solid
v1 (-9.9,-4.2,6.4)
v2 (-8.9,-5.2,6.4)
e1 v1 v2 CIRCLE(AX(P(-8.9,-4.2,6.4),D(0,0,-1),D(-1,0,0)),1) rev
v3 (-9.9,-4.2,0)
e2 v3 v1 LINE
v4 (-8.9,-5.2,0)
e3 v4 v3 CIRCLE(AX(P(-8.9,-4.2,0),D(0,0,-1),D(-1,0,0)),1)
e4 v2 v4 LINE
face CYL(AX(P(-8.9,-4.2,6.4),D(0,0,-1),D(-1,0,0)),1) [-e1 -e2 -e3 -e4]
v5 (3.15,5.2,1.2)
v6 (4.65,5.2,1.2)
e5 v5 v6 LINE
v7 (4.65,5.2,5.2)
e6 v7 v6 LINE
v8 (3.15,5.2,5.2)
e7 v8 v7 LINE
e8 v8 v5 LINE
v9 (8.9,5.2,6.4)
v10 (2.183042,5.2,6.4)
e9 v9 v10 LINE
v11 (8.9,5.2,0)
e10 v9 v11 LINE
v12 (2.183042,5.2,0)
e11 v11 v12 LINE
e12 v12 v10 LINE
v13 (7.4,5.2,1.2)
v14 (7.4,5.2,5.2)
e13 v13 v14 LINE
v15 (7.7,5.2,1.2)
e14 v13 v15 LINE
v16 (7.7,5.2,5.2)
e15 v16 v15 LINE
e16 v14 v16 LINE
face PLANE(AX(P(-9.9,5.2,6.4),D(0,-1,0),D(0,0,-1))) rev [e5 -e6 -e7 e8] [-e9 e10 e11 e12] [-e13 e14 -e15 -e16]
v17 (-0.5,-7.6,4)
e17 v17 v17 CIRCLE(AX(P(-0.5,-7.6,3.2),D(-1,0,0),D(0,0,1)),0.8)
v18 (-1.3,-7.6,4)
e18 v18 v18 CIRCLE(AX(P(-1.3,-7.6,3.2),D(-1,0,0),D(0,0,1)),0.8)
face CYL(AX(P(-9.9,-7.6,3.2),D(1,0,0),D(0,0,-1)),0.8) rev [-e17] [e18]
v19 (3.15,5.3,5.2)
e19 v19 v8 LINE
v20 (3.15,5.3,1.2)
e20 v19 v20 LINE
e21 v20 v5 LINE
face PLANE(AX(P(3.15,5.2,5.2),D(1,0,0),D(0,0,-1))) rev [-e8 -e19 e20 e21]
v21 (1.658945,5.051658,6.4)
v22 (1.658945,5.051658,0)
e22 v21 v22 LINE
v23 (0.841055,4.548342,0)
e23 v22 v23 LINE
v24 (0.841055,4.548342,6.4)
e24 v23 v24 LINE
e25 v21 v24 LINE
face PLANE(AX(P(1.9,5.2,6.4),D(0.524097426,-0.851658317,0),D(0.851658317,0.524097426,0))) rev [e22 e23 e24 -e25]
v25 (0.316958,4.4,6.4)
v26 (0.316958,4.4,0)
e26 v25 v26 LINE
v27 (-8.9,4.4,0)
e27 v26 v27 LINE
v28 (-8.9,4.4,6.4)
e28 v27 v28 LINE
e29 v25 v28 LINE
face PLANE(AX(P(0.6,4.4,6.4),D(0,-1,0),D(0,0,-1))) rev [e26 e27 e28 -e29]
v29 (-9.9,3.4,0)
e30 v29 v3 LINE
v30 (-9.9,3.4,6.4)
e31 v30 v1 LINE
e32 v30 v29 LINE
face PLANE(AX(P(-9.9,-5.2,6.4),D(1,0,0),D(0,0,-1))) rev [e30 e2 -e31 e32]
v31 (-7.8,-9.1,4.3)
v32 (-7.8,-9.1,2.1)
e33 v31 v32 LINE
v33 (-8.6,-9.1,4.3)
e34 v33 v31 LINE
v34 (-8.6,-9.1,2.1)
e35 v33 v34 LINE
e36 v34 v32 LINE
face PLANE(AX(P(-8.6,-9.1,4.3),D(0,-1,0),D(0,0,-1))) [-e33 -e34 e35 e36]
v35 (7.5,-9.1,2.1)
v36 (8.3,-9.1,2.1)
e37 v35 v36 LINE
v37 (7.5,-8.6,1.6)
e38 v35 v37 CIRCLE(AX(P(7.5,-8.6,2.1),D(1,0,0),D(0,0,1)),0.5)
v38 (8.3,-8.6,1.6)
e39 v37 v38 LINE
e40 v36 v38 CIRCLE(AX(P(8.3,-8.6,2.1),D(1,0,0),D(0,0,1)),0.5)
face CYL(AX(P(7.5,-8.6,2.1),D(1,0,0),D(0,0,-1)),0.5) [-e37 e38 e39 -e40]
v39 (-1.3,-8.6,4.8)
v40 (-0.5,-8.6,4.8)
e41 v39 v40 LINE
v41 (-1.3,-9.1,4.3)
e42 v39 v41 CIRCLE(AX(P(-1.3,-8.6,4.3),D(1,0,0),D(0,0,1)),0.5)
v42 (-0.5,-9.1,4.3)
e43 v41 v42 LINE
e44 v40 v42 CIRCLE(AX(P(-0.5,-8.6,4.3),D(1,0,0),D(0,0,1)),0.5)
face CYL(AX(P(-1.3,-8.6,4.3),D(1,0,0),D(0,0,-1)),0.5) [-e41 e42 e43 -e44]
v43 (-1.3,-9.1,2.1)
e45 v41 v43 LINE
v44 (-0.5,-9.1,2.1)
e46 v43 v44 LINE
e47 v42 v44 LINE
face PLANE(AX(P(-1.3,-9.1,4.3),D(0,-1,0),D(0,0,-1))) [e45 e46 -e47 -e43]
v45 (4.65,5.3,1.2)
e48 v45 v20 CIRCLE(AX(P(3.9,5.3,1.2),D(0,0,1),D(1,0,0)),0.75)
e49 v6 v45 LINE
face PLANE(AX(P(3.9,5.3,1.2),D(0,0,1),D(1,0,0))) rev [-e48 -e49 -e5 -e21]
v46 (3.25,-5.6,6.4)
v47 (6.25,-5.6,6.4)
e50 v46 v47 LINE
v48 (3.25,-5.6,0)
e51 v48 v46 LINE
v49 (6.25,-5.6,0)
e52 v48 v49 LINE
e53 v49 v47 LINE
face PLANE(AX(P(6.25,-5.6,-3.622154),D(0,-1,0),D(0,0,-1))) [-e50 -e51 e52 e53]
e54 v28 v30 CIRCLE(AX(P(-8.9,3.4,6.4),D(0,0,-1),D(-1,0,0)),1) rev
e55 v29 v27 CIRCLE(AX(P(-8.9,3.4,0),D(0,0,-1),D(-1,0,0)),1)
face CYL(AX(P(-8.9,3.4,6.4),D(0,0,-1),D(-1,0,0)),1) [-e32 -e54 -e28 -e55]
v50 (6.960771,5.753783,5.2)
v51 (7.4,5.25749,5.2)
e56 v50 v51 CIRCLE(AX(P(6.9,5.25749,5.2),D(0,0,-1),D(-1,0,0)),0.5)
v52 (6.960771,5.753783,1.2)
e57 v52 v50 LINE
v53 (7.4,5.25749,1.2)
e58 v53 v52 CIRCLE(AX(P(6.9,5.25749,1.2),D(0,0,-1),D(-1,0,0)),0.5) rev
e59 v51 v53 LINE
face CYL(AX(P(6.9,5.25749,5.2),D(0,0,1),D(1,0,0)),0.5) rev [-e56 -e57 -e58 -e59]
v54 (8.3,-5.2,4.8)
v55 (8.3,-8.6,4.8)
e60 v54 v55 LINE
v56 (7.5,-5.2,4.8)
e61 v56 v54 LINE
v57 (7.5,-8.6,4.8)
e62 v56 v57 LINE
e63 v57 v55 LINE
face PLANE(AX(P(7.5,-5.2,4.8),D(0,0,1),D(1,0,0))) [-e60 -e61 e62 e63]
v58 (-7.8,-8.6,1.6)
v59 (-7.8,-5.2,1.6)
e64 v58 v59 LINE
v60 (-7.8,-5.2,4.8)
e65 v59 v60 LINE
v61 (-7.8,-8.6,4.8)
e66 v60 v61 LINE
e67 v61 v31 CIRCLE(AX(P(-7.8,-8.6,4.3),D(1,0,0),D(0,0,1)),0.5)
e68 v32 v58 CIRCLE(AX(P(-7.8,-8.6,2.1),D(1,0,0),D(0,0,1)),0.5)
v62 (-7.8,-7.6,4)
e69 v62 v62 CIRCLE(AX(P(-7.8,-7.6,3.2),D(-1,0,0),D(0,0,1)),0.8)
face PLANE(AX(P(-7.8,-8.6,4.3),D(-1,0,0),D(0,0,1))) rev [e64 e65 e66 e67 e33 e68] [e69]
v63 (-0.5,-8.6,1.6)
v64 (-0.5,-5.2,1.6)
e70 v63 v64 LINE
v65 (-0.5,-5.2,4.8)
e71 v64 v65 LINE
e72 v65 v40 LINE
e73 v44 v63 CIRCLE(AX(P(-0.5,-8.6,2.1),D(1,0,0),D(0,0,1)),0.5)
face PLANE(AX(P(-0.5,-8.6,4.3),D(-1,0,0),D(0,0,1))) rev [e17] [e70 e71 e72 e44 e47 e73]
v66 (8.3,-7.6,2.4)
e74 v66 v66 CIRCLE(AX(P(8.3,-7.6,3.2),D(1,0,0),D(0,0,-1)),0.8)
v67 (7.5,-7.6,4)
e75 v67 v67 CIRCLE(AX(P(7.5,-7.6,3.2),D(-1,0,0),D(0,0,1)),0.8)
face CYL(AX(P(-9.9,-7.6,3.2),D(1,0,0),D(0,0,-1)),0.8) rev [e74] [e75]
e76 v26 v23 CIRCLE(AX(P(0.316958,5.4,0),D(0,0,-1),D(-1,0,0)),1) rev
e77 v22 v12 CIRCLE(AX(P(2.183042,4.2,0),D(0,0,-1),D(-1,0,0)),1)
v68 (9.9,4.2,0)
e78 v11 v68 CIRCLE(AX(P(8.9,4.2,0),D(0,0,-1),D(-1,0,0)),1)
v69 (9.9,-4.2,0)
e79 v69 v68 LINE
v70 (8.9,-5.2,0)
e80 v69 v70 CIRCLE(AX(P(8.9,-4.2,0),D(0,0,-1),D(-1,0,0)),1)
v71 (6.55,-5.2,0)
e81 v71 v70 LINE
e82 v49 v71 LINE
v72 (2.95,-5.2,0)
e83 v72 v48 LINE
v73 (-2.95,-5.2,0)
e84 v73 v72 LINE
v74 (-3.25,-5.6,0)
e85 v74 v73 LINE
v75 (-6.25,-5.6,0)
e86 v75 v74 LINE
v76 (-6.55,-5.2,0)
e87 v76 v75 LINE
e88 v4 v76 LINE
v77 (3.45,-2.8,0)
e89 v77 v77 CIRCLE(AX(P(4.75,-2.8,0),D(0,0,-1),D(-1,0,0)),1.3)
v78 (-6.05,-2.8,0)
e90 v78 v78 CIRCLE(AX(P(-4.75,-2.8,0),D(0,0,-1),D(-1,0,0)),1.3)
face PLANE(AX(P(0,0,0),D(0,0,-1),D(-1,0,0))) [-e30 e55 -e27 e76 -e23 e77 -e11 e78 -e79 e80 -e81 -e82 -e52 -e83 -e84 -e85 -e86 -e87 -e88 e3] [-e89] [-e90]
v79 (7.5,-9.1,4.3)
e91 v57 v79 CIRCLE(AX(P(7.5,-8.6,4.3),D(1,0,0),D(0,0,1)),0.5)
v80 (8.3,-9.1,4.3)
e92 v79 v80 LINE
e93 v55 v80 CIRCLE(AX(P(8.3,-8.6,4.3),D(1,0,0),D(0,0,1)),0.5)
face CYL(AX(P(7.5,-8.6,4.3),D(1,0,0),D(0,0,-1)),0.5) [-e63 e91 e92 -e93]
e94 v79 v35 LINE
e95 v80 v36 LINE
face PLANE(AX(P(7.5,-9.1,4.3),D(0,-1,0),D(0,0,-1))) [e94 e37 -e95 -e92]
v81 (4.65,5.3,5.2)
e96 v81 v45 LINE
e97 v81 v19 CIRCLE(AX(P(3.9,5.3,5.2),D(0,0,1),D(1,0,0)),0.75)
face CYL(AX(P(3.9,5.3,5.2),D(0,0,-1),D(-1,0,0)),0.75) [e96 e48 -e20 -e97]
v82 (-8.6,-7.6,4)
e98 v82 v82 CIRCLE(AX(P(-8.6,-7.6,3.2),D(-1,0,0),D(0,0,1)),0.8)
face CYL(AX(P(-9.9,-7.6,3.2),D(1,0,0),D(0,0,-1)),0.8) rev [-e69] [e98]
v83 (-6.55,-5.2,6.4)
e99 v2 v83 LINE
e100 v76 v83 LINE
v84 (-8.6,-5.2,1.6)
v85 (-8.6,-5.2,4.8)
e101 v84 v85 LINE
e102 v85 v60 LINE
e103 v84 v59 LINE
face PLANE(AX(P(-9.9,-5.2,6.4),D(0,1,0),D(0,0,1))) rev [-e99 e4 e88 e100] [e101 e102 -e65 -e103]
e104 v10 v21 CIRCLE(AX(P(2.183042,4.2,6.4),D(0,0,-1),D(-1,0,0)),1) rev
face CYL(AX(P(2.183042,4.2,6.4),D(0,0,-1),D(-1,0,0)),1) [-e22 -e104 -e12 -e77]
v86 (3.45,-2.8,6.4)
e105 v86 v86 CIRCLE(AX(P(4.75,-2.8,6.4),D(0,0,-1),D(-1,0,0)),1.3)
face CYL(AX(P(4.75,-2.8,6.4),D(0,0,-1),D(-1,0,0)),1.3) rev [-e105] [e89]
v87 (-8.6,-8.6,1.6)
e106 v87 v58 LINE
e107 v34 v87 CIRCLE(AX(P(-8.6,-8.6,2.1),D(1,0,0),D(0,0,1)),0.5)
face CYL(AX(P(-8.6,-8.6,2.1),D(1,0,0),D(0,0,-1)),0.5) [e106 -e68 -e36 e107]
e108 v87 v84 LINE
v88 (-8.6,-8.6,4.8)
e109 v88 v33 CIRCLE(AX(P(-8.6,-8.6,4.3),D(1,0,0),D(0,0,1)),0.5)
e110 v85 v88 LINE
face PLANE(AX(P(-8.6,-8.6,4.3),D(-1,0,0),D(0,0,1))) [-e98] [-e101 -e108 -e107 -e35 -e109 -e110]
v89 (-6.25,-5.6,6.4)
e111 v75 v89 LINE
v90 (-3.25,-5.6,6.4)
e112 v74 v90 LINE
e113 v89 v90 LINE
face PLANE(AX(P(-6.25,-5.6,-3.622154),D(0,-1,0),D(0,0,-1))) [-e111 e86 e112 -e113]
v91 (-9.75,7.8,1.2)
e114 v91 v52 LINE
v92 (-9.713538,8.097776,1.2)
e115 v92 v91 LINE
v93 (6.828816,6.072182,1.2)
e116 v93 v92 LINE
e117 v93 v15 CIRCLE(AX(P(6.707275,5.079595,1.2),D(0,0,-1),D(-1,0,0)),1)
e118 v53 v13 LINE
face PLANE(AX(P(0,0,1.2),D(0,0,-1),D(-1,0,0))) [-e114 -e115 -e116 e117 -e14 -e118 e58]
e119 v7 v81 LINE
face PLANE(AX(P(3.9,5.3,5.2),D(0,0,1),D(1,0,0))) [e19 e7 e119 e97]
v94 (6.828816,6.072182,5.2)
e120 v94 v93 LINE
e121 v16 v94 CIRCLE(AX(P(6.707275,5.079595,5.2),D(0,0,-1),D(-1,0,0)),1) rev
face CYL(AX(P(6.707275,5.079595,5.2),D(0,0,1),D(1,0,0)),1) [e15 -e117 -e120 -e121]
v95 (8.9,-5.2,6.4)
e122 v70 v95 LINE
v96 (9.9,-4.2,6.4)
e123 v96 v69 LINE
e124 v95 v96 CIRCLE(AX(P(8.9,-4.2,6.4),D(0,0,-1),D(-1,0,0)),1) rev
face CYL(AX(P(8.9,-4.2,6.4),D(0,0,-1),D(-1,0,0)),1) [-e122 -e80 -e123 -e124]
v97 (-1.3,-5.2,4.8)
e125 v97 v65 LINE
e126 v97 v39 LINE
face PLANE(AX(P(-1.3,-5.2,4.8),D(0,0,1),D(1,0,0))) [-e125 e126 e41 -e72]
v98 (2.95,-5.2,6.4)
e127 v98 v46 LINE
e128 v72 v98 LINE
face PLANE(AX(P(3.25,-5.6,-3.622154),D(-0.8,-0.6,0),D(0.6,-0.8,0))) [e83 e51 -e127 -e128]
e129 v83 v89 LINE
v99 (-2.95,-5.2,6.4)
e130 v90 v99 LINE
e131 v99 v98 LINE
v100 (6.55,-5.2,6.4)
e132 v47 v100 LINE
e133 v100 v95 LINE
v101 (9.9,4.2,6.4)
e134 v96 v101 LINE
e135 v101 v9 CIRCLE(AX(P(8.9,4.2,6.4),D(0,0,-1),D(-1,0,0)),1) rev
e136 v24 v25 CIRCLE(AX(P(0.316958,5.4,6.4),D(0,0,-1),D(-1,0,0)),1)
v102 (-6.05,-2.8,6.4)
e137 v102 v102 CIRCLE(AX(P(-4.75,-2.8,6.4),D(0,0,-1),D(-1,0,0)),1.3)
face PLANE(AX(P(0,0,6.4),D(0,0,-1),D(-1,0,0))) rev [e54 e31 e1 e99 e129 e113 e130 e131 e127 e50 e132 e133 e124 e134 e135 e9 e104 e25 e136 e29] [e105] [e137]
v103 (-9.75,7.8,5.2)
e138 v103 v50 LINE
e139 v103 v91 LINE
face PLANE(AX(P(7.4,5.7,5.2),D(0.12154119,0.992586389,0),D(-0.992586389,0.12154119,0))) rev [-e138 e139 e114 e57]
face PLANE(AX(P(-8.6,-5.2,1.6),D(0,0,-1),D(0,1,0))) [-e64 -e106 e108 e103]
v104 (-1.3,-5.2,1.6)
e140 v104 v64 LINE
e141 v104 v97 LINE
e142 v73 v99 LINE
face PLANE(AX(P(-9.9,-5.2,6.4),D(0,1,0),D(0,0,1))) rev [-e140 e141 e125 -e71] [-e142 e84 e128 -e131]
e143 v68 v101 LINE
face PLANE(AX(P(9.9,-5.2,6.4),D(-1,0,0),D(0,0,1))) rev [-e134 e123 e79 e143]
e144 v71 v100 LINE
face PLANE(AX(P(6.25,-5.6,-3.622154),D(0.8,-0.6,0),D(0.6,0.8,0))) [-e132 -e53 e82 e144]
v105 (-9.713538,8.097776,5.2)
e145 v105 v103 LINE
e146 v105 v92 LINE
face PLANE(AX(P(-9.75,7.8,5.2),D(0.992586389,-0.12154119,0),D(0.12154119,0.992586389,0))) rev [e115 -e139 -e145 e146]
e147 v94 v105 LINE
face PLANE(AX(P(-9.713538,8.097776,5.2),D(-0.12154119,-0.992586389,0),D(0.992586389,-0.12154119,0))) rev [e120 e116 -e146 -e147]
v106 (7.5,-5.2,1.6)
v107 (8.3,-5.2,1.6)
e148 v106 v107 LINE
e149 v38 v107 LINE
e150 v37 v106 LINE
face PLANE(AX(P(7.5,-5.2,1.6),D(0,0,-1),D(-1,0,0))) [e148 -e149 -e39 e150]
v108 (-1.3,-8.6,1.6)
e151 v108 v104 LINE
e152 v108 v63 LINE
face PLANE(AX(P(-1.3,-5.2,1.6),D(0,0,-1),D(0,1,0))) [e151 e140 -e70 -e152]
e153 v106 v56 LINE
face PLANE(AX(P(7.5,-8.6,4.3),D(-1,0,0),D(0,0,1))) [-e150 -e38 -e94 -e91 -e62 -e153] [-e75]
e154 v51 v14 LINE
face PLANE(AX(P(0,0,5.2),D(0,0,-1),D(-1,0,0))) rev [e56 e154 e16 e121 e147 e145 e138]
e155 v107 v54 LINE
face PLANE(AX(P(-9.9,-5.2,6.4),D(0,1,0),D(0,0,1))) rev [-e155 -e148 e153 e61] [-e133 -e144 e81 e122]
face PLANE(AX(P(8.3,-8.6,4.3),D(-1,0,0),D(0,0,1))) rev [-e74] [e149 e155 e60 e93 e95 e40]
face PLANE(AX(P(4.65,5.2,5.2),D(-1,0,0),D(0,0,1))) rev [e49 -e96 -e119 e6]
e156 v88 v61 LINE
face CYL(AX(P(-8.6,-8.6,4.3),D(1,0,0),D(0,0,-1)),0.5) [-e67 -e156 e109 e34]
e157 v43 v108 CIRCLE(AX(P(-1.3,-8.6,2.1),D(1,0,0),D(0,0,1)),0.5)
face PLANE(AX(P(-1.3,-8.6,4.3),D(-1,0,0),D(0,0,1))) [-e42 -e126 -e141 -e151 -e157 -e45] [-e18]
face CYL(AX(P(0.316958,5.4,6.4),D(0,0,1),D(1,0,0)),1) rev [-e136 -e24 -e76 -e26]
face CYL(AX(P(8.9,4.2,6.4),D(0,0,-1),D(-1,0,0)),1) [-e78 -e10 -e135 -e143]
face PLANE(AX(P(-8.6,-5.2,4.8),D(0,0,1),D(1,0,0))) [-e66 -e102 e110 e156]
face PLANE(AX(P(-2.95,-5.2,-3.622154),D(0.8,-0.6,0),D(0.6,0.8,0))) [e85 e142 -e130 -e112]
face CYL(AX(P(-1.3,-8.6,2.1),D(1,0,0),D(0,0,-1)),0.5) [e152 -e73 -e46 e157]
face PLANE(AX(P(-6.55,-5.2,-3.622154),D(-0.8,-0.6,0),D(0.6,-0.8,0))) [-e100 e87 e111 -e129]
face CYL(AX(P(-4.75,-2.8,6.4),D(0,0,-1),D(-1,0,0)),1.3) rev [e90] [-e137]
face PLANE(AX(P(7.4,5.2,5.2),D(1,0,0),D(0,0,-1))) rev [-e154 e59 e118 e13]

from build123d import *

# Parameters (mm, degrees)
SKETCH_1_W          = 19.8
SKETCH_1_H          = 10.4
EXTRUDE_1_DEPTH     = 6.4
SKETCH_2_R          = 1.3
CUT_EXTRUDE_1_DEPTH = 13.884486796
EXTRUDE_2_DEPTH     = 0.8
EXTRUDE_3_DEPTH     = 0.8
EXTRUDE_4_DEPTH     = 0.8
SKETCH_8_R          = 0.8
CUT_EXTRUDE_3_DEPTH = 22.33096341
CUT_EXTRUDE_4_DEPTH = 15.892279879
FILLET_3_R          = 1
EXTRUDE_5_DEPTH     = 4
EXTRUDE_10_DEPTH    = 4
FILLET_4_R          = 0.5
FILLET_5_R          = 1
FILLET_6_R          = 1
FILLET_7_R          = 1
EXTRUDE_11_DEPTH    = 6.4


with BuildPart() as part:
    # 草图1 → 凸台-拉伸1 (new body)
    with BuildSketch(Plane.XY):
        Rectangle(SKETCH_1_W, SKETCH_1_H)
    extrude(amount=EXTRUDE_1_DEPTH)

    # 草图2 → 切除-拉伸1 (cut, through all)
    with BuildSketch(Plane(origin=(0, 0, 0), x_dir=(-1, 0, 0), z_dir=(0, 0, -1))):
        with Locations((-4.75, -2.8)):
            Circle(SKETCH_2_R)
        with Locations((4.75, -2.8)):
            Circle(SKETCH_2_R)
    extrude(amount=-CUT_EXTRUDE_1_DEPTH, mode=Mode.SUBTRACT)

    # 草图5 → 凸台-拉伸2 (add)
    with BuildSketch(Plane(origin=(8.3, 0, 0), x_dir=(0, 0, -1), z_dir=(1, 0, 0))):
        with BuildLine():
            Line((-4.8, -5.2), (-1.6, -5.2))
            Line((-1.6, -5.2), (-1.6, -8.6))
            ThreePointArc((-1.6, -8.6), (-1.746446609, -8.953553391), (-2.1, -9.1))
            Line((-2.1, -9.1), (-4.3, -9.1))
            ThreePointArc((-4.3, -9.1), (-4.653553391, -8.953553391), (-4.8, -8.6))
            Line((-4.8, -8.6), (-4.8, -5.2))
        make_face()
    extrude(amount=-EXTRUDE_2_DEPTH)

    # 草图6 → 凸台-拉伸3 (add)
    with BuildSketch(Plane(origin=(-0.5, 0, 0), x_dir=(0, 0, -1), z_dir=(1, 0, 0))):
        with BuildLine():
            Line((-4.8, -5.2), (-1.6, -5.2))
            Line((-1.6, -5.2), (-1.6, -8.6))
            ThreePointArc((-1.6, -8.6), (-1.746446609, -8.953553391), (-2.1, -9.1))
            Line((-2.1, -9.1), (-4.3, -9.1))
            ThreePointArc((-4.3, -9.1), (-4.653553391, -8.953553391), (-4.8, -8.6))
            Line((-4.8, -8.6), (-4.8, -5.2))
        make_face()
    extrude(amount=-EXTRUDE_3_DEPTH)

    # 草图7 → 凸台-拉伸4 (add)
    with BuildSketch(Plane(origin=(-7.8, 0, 0), x_dir=(0, 0, -1), z_dir=(1, 0, 0))):
        with BuildLine():
            Line((-4.8, -5.2), (-1.6, -5.2))
            Line((-1.6, -5.2), (-1.6, -8.6))
            ThreePointArc((-1.6, -8.6), (-1.746446609, -8.953553391), (-2.1, -9.1))
            Line((-2.1, -9.1), (-4.3, -9.1))
            ThreePointArc((-4.3, -9.1), (-4.653553391, -8.953553391), (-4.8, -8.6))
            Line((-4.8, -8.6), (-4.8, -5.2))
        make_face()
    extrude(amount=-EXTRUDE_4_DEPTH)

    # 草图8 → 切除-拉伸3 (cut, through all)
    with BuildSketch(Plane(origin=(8.3, 0, 0), x_dir=(0, 0, -1), z_dir=(1, 0, 0))):
        with Locations(Location((-3.2, -7.6, 0), (0, 0, 180))):
            Circle(SKETCH_8_R)
    extrude(amount=-CUT_EXTRUDE_3_DEPTH, mode=Mode.SUBTRACT)

    # 草图9 → 切除-拉伸4 (cut, through all)
    with BuildSketch(Plane(origin=(0, 0, 0), x_dir=(-1, 0, 0), z_dir=(0, 0, -1))):
        Polygon((-1.9, 5.2), (-0.6, 4.4), (9.9, 4.4), (9.9, 5.2), align=None)
    extrude(amount=-CUT_EXTRUDE_4_DEPTH, mode=Mode.SUBTRACT)

    # 圆角3
    fillet_3_edges = [part.edges().sort_by_distance(p)[0] for p in [
        (1.9, 5.2, 3.2),
        (0.6, 4.4, 3.2),
    ]]
    fillet(fillet_3_edges, radius=FILLET_3_R)

    # 草图10 → 凸台-拉伸5 (add)
    with BuildSketch(Plane.XY.offset(1.2)):
        with BuildLine():
            Line((3.15, 5.2), (4.65, 5.2))
            Line((4.65, 5.2), (4.65, 5.3))
            ThreePointArc((4.65, 5.3), (3.9, 6.05), (3.15, 5.3))
            Line((3.15, 5.3), (3.15, 5.2))
        make_face()
    extrude(amount=EXTRUDE_5_DEPTH)

    # 草图12 → 凸台-拉伸10 (add)
    with BuildSketch(Plane.XY.offset(1.2)):
        Polygon((7.4, 5.2), (7.4, 5), (7.7, 5), (7.7, 5.2), (7.7, 5.965506001), (-9.713537643, 8.097775917), (-9.75, 7.8), (7.4, 5.7), align=None)
    extrude(amount=EXTRUDE_10_DEPTH)

    # 圆角4
    fillet_4_edges = [part.edges().sort_by_distance(p)[0] for p in [
        (7.4, 5.7, 3.2),
    ]]
    fillet(fillet_4_edges, radius=FILLET_4_R)

    # 圆角5
    # the kernel refuses this fillet: 1 mm, written as the material it takes off along each edge
    with BuildSketch(Plane(origin=(7.7, 5.965506001, -0.994226351), x_dir=(0, -1, 0), z_dir=(0, 0, 1))) as fillet_5_piece_1:
        with BuildLine():
            CenterArc((0.885910836, -0.992724874), FILLET_5_R, 96.915467292, 76.103475301)
            Line((-0.106675553, -0.871183684), (-0.126527281, -0.86875286))
            Line((-0.126527281, -0.86875286), (-0.019851728, 0.002430824))
            Line((-0.019851728, 0.002430824), (0, 0.02))
            ThreePointArc((0, 0.02), (0.382753001, 0.02), (0.763097904, 0.019854497))
            Line((0.763097904, 0.019854497), (0.765506001, 0))
        make_face()
    extrude(amount=8.388452701, mode=Mode.SUBTRACT)

    # 圆角6
    fillet_6_edges = [part.edges().sort_by_distance(p)[0] for p in [
        (9.9, -5.2, 3.2),
        (-9.9, -5.2, 3.2),
    ]]
    fillet(fillet_6_edges, radius=FILLET_6_R)

    # 圆角7
    fillet_7_edges = [part.edges().sort_by_distance(p)[0] for p in [
        (9.9, 5.2, 3.2),
        (-9.9, 4.4, 3.2),
    ]]
    fillet(fillet_7_edges, radius=FILLET_7_R)

    # 草图13 → 凸台-拉伸11 (add)
    with BuildSketch(Plane.XY.offset(6.4)):
        Polygon((-6.55, -5.2), (-6.25, -5.6), (-3.25, -5.6), (-2.95, -5.2), align=None)
        Polygon((6.25, -5.6), (3.25, -5.6), (2.95, -5.2), (6.55, -5.2), align=None)
    extrude(amount=-EXTRUDE_11_DEPTH)


solid = part.part
